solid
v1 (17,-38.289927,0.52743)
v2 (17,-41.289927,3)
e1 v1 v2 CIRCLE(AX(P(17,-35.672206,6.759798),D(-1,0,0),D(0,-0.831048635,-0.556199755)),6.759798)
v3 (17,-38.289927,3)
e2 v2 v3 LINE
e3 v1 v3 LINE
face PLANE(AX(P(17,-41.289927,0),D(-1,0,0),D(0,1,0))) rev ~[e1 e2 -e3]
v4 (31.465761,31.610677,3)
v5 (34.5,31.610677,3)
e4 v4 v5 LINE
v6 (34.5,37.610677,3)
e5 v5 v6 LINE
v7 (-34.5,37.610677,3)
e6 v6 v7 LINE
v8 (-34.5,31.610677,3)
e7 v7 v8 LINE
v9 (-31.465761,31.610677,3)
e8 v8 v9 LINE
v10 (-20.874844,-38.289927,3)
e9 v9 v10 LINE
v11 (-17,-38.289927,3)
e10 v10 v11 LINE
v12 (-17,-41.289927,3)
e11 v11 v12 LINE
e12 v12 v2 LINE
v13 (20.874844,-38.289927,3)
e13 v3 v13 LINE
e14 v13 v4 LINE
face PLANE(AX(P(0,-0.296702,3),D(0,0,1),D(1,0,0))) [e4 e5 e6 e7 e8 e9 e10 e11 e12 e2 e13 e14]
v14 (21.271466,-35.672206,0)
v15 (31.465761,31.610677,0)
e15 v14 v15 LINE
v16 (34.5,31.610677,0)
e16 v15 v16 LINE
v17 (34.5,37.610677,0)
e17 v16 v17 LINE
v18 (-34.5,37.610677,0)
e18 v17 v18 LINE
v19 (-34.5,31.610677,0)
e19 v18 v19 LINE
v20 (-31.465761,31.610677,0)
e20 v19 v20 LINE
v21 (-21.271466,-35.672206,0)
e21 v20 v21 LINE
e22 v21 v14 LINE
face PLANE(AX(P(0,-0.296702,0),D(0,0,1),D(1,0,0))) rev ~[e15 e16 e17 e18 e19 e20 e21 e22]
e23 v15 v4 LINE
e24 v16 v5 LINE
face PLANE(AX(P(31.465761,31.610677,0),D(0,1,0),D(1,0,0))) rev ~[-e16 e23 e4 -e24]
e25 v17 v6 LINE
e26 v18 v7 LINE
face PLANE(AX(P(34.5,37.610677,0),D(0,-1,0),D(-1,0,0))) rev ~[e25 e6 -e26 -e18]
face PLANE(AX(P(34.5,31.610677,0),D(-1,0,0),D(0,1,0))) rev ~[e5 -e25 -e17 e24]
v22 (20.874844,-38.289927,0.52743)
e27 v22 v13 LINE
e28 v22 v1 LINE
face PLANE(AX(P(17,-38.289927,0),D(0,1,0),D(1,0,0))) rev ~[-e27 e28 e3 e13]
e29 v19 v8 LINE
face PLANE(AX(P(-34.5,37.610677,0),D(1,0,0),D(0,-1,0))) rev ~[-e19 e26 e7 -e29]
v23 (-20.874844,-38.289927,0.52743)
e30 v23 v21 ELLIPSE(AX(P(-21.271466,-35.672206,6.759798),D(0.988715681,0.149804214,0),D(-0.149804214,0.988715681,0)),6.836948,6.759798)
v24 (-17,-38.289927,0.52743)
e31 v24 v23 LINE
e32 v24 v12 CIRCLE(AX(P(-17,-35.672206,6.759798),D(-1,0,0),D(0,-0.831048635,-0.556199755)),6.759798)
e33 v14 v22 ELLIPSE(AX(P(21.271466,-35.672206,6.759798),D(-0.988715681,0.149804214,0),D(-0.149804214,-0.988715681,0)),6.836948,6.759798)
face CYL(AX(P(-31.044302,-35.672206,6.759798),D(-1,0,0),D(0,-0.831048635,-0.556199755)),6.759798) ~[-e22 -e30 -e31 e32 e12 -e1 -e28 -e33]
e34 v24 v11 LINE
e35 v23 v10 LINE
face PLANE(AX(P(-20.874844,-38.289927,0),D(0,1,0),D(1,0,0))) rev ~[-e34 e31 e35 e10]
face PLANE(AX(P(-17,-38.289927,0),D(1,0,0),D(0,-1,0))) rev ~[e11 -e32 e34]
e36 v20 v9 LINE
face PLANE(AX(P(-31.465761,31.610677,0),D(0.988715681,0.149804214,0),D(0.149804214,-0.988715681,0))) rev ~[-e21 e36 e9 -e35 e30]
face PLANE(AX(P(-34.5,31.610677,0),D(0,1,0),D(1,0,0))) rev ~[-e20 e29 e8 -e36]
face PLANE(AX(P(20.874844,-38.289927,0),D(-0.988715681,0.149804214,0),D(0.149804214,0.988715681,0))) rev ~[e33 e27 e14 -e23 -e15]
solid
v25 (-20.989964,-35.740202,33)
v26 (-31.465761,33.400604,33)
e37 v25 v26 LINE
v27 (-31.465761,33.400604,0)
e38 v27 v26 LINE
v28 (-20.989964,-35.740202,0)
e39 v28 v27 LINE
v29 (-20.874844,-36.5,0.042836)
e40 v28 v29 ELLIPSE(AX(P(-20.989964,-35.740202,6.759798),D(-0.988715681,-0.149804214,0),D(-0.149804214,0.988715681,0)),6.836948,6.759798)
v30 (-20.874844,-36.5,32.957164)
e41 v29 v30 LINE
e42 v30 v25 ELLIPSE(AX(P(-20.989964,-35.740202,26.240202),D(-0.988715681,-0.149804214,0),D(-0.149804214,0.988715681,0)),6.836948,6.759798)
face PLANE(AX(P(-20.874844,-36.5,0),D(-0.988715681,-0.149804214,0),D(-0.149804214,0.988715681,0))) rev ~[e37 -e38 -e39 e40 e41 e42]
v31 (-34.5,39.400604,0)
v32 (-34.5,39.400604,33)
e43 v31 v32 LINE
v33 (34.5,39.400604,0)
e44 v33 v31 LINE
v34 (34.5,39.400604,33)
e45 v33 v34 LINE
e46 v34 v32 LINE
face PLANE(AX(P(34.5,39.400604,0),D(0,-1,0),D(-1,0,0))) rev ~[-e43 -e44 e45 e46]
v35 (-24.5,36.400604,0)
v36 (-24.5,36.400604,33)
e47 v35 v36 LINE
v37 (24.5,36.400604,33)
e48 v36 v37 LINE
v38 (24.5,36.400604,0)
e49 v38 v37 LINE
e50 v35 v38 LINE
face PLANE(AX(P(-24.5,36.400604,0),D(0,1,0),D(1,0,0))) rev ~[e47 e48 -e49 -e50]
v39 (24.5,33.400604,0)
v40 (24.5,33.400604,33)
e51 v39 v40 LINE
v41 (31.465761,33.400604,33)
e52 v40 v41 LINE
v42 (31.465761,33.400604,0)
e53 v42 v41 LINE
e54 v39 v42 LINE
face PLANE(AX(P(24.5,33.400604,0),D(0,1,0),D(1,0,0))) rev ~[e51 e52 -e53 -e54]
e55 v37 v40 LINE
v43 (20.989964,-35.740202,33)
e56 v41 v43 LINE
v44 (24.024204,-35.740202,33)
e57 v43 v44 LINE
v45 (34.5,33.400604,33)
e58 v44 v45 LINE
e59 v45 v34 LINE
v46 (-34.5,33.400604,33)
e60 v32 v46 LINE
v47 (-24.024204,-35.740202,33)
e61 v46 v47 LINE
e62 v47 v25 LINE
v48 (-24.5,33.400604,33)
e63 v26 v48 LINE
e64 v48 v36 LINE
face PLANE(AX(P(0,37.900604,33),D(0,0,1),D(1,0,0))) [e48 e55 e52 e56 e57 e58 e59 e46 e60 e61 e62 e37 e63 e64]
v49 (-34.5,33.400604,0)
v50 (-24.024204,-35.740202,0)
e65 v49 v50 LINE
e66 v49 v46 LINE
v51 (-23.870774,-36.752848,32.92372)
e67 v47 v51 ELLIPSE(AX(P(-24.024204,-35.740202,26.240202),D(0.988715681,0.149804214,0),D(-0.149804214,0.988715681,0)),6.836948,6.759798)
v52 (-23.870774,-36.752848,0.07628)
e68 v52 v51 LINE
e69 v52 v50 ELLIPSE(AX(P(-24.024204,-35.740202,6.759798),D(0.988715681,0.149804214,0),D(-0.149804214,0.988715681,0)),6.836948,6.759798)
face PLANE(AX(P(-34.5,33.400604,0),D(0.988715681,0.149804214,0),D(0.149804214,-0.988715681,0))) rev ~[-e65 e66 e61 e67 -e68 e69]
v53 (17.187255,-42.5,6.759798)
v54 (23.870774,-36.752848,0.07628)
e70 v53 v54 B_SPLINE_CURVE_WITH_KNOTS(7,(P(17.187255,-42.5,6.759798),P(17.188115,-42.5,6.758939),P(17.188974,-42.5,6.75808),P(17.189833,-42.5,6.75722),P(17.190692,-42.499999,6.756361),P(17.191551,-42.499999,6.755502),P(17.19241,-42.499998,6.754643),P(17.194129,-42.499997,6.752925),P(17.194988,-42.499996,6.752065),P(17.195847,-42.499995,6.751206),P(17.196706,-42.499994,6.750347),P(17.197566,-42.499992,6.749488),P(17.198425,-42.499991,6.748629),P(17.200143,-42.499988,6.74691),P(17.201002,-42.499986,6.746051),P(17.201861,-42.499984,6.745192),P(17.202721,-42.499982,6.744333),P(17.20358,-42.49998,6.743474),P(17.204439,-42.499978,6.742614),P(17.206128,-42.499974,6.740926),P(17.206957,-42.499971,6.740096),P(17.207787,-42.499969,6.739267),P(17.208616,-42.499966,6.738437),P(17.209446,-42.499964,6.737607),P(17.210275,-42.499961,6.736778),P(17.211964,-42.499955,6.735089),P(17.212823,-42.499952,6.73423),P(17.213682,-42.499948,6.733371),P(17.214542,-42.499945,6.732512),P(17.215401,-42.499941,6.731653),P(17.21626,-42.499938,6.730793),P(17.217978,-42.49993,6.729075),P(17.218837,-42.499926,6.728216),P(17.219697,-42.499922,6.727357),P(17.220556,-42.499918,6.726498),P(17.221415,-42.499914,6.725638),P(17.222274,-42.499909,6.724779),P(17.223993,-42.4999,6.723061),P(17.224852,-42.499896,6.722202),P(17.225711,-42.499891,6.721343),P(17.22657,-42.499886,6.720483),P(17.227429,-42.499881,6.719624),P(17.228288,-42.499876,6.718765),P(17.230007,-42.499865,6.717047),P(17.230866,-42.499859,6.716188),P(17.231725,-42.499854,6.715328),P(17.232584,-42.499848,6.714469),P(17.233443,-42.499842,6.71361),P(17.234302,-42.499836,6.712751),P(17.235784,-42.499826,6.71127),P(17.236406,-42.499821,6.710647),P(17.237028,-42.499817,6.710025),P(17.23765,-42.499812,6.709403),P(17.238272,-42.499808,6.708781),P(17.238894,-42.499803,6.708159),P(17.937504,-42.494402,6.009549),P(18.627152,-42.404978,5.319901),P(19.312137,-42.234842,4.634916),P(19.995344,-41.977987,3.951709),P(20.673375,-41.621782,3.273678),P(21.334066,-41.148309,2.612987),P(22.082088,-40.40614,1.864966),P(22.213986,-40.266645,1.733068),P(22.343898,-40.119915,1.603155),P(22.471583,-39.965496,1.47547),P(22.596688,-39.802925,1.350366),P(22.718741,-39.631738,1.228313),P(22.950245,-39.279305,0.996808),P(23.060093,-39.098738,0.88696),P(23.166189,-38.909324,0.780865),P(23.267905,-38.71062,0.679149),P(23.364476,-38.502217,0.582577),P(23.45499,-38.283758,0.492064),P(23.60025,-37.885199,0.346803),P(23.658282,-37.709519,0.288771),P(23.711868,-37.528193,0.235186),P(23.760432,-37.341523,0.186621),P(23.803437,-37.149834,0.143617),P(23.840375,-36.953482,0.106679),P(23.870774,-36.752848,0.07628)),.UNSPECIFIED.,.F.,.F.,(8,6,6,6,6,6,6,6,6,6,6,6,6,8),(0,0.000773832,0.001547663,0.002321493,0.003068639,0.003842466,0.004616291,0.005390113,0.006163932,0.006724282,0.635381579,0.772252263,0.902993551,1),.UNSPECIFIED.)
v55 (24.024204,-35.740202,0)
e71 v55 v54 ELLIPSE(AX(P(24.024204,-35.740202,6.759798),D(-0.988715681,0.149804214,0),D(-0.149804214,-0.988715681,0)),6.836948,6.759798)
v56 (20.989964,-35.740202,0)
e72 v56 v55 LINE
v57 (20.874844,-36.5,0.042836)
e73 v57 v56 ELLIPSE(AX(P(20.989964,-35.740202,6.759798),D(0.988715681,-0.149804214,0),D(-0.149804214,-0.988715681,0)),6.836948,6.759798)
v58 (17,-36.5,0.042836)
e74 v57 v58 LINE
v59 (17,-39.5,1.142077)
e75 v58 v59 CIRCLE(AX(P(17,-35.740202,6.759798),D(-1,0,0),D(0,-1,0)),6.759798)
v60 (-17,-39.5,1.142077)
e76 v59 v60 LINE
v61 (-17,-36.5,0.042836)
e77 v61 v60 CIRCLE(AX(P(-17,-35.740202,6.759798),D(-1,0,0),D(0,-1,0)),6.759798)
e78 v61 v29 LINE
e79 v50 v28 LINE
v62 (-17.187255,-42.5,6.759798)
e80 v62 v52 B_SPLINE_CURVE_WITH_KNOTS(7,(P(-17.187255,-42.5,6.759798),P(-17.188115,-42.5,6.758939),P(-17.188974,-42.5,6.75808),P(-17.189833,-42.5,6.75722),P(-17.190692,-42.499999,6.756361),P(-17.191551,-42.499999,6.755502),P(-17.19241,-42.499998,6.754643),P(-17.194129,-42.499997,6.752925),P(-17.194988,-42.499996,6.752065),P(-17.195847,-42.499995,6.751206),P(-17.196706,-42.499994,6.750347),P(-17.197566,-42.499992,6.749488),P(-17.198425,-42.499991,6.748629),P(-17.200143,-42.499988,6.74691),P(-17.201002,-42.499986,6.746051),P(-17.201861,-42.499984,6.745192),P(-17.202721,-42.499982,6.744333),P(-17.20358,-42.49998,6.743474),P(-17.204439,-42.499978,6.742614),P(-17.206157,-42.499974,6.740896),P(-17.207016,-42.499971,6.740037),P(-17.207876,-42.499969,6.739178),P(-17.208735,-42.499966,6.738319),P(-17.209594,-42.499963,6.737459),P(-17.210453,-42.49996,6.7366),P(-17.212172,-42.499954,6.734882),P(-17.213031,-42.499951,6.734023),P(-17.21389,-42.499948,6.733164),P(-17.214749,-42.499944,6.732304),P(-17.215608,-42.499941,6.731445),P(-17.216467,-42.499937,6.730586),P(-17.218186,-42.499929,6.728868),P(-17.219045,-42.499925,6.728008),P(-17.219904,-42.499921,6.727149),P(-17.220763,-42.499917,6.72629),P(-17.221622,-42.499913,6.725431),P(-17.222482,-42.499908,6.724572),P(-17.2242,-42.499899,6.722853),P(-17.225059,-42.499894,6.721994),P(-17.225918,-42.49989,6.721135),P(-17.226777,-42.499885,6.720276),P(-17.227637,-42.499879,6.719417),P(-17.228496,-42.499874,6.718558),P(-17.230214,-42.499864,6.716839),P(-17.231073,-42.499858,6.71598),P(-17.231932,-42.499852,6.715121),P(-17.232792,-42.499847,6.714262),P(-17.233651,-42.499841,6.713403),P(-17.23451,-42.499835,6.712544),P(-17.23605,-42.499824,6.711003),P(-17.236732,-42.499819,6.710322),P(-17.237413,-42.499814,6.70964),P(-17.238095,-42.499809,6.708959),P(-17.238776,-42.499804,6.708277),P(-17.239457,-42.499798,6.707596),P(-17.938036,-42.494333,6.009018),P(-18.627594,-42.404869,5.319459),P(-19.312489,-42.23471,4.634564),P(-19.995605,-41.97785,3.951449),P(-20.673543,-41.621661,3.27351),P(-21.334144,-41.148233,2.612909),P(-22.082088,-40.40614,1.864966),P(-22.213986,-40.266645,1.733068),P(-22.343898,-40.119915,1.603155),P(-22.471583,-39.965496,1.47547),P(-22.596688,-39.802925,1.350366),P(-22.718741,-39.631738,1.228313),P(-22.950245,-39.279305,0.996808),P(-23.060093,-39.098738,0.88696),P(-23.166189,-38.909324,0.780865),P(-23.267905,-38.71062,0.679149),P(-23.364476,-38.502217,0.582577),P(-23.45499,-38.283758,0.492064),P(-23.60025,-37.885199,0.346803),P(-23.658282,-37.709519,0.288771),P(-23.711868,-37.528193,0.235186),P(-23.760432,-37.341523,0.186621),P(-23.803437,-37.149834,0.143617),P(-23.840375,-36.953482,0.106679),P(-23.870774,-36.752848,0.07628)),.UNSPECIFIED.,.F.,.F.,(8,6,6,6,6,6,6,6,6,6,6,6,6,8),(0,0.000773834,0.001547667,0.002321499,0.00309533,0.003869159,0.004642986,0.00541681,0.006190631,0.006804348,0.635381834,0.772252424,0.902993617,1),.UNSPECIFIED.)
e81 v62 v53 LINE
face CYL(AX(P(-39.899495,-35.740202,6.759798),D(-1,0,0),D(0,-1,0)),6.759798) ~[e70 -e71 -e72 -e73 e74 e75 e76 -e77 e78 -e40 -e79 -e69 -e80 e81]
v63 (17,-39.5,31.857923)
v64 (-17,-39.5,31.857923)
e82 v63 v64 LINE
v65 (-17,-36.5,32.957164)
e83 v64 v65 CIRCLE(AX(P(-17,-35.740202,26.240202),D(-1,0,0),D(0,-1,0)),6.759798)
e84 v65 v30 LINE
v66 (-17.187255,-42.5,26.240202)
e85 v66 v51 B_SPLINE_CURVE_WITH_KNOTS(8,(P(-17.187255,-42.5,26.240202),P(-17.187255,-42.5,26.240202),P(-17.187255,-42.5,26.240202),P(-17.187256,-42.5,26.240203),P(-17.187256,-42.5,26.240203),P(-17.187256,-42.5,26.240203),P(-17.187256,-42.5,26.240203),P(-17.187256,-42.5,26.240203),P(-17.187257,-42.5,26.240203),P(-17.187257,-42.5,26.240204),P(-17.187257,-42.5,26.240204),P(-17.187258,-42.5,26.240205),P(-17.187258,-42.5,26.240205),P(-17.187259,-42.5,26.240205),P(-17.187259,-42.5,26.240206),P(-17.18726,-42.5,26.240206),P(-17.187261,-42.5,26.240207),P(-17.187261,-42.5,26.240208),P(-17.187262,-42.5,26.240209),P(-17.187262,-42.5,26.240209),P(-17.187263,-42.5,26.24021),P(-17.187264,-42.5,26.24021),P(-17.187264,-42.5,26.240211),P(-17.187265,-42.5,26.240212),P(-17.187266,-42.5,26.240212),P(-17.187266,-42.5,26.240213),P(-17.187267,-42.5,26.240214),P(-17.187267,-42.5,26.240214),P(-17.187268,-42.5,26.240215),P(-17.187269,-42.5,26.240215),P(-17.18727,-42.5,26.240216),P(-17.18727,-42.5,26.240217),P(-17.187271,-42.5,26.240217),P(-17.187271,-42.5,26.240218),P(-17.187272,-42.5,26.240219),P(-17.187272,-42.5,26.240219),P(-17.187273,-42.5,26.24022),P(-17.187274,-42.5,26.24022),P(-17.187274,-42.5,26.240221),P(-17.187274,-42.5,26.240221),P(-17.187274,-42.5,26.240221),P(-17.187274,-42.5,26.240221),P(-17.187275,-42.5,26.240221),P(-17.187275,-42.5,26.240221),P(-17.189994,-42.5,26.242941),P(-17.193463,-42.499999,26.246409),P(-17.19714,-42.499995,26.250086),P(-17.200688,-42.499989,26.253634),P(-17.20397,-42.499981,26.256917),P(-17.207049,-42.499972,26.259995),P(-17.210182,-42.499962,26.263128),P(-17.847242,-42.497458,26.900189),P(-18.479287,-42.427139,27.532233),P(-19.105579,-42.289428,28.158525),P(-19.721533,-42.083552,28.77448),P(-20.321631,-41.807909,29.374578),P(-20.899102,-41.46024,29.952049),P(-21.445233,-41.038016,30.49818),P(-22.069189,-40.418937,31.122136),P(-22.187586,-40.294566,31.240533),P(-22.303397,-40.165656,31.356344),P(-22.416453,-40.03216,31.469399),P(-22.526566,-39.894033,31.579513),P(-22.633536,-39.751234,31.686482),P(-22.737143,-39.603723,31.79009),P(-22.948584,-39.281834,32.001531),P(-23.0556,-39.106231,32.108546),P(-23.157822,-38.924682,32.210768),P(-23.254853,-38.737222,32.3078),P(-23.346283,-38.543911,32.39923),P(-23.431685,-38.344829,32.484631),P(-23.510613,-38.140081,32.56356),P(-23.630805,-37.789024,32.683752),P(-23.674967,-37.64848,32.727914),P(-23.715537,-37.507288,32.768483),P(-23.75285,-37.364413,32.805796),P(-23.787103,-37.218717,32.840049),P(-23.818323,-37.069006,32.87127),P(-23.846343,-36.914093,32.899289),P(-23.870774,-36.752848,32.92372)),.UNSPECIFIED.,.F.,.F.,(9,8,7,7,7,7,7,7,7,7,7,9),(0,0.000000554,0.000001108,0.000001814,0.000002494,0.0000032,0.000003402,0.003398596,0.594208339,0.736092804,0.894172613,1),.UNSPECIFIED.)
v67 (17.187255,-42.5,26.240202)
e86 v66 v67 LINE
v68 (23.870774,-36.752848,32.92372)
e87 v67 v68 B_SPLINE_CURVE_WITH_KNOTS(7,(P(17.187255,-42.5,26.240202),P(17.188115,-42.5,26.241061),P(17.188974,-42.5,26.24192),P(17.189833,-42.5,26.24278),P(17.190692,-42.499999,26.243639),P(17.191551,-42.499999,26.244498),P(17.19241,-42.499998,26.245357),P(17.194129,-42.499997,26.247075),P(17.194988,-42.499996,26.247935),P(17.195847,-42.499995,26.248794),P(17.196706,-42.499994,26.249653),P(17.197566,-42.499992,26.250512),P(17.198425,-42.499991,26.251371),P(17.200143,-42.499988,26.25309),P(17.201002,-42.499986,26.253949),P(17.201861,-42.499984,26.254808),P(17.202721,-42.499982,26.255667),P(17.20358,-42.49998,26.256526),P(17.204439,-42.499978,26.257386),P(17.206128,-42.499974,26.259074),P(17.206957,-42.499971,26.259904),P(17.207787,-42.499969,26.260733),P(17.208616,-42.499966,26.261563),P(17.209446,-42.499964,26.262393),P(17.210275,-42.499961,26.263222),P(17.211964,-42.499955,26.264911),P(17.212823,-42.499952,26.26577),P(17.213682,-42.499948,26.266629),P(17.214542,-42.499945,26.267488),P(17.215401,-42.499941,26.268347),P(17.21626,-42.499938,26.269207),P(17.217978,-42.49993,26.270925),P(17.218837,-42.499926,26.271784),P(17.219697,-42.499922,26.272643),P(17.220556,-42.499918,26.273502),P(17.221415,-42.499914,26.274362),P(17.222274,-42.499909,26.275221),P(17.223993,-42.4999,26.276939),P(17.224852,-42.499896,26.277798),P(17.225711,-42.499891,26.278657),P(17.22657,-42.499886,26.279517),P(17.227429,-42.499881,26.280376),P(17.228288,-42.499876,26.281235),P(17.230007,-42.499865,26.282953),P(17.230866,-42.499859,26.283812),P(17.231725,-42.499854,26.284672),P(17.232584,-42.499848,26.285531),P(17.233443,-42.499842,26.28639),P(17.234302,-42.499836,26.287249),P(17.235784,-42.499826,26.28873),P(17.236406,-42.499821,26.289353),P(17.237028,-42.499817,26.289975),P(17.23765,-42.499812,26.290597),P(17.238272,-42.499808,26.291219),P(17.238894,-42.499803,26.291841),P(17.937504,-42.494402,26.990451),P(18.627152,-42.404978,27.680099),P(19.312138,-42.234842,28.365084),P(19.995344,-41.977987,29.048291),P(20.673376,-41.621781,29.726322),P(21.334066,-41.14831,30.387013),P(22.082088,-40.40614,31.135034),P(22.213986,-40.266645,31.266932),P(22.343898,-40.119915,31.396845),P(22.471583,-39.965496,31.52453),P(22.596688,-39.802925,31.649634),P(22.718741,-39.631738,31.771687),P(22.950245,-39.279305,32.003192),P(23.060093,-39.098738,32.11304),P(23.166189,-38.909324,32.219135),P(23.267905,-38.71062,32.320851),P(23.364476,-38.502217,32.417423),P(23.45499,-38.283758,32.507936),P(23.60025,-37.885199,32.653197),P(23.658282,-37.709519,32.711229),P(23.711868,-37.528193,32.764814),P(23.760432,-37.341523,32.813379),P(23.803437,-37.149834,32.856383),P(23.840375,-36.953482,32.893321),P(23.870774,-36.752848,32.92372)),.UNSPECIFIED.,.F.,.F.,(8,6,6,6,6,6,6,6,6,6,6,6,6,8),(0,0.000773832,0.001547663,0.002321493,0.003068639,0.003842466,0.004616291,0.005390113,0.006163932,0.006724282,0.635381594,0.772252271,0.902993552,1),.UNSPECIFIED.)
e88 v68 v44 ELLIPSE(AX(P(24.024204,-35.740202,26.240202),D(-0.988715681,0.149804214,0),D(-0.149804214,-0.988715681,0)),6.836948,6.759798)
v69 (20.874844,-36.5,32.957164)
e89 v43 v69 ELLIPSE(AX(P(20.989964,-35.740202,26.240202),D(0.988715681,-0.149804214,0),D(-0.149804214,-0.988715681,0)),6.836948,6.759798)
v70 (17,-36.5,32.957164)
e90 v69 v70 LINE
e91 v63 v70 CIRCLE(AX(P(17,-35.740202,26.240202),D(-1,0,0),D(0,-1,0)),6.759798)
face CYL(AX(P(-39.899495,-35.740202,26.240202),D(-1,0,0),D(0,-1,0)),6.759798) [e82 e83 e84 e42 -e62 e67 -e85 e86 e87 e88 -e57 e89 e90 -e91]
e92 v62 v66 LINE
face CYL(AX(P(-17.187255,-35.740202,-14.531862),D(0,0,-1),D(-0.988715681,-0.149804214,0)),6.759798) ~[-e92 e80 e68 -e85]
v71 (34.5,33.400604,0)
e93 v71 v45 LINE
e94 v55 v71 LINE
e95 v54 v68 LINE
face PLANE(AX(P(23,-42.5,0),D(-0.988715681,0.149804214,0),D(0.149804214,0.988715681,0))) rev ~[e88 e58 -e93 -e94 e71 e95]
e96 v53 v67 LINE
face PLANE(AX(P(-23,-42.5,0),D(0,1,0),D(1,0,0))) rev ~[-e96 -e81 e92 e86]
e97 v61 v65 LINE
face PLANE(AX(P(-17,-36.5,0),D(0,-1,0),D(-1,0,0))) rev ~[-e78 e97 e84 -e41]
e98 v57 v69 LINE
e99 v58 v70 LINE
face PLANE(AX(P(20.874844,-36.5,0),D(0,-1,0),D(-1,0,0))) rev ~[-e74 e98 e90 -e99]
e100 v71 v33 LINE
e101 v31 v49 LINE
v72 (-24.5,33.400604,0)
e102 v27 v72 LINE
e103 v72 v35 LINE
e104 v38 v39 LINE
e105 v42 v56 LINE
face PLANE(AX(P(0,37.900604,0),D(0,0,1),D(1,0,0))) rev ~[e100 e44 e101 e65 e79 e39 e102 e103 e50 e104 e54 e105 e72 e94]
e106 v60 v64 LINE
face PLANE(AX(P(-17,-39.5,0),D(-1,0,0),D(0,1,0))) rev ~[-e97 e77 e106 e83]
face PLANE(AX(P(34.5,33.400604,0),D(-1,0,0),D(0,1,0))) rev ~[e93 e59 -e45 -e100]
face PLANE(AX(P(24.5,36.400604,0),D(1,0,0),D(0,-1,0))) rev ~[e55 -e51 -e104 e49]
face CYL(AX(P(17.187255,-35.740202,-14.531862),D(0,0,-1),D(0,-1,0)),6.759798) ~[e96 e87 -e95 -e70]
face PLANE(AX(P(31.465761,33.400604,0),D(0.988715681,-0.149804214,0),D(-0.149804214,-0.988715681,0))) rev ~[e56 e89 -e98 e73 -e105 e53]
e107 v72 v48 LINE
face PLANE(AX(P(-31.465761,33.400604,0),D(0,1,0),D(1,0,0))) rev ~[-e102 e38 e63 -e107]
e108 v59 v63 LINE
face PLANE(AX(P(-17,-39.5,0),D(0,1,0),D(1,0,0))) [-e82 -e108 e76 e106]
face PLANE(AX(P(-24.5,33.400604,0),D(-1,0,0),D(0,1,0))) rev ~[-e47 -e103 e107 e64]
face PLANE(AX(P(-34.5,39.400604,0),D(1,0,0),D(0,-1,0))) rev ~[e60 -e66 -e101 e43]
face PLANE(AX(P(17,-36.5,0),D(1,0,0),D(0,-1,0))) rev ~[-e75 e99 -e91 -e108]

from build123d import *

# Parameters (mm, degrees)
F0_W          = 34
F0_H          = 3
F1_DEPTH      = 33
F3_DEPTH      = 3
F4_T1_DEPTH   = 62.0637231031
F4_T3_DEPTH   = 79.7989898732
F4_2_T1_DEPTH = 62.0886043833


# Not quite as in the source:
# - a fillet or chamfer that OpenCascade refuses, or shapes differently, is made with other operations: its cross-section is extruded or revolved along the edge and cut away or added


with BuildPart() as f1:
    # F0 (on Top) → F1 (new body)
    with BuildSketch(Plane.XY):
        Polygon((-34.5, 39.400604268), (-34.5, 36.400604268), (-24.5, 36.400604268), (24.5, 36.400604268), (34.5, 36.400604268), (34.5, 39.400604268), align=None)
        Polygon((-24.5, 36.400604268), (-34.5, 36.400604268), (-34.5, 33.400604268), (-31.4657606752, 33.400604268), (-24.5, 33.400604268), align=None)
        Polygon((34.5, 36.400604268), (24.5, 36.400604268), (24.5, 33.400604268), (31.4657606752, 33.400604268), (34.5, 33.400604268), align=None)
        Polygon((-23, -39.5), (-23, -42.5), (-17, -42.5), (-17, -39.5), (-20.4203025109, -39.5), align=None)
        Polygon((-17, -36.5), (-20.8748443467, -36.5), (-20.4203025109, -39.5), (-17, -39.5), align=None)
        Polygon((-20.4203025109, -39.5), (-20.8748443467, -36.5), (-23, -36.5), (-23, -39.5), align=None)
        Polygon((20.4203025109, -39.5), (20.8748443467, -36.5), (17, -36.5), (17, -39.5), align=None)
        Polygon((17, -39.5), (17, -42.5), (23, -42.5), (23, -39.5), (20.4203025109, -39.5), align=None)
        Polygon((23, -36.5), (20.8748443467, -36.5), (20.4203025109, -39.5), (23, -39.5), align=None)
        Polygon((23, -42.5), (34.5, 33.400604268), (31.4657606752, 33.400604268), (20.8748443467, -36.5), (23, -36.5), (23, -39.5), align=None)
        Polygon((-31.4657606752, 33.400604268), (-34.5, 33.400604268), (-23, -42.5), (-23, -39.5), (-23, -36.5), (-20.8748443467, -36.5), align=None)
        with Locations((0, -41)):
            Rectangle(F0_W, F0_H)
    extrude(amount=F1_DEPTH)

    # F4: fillet of radius 6.7597979746 on 4 edges, made by hand

    # F4_s2 → F4_t1 (cut)
    with BuildSketch(Plane.XY.offset(-14.5318615516)):
        with BuildLine():
            ThreePointArc((-23.8707736364, -36.7528482447), (-21.5946120019, -40.8656362762), (-17.1872553794, -42.5))
            Line((-17.1872553794, -42.5), (-23, -42.5))
            Line((-23, -42.5), (-23.8707736364, -36.7528482447))
        make_face()
        with BuildLine():
            ThreePointArc((17.1872553794, -42.5), (21.5946120019, -40.8656362762), (23.8707736364, -36.7528482447))
            Line((23.8707736364, -36.7528482447), (23, -42.5))
            Line((23, -42.5), (17.1872553794, -42.5))
        make_face()
    extrude(amount=F4_T1_DEPTH, mode=Mode.SUBTRACT)

    # F4_s4 → F4_t3 (cut)
    with BuildSketch(Plane.YZ.offset(-39.8994949366)):
        with BuildLine():
            ThreePointArc((-42.5, 6.7597979746), (-40.5201010127, 1.9798989873), (-35.7402020254, 0))
            Line((-35.7402020254, 0), (-42.5, 0))
            Line((-42.5, 0), (-42.5, 6.7597979746))
        make_face()
        with BuildLine():
            ThreePointArc((-42.5, 26.2402020254), (-40.5201010127, 31.0201010127), (-35.7402020254, 33))
            Line((-35.7402020254, 33), (-42.5, 33))
            Line((-42.5, 33), (-42.5, 26.2402020254))
        make_face()
    extrude(amount=F4_T3_DEPTH, mode=Mode.SUBTRACT)


with BuildPart() as f3:
    # F2 (on Top) → F3 (new body)
    with BuildSketch(Plane.XY):
        Polygon((24.5, 34.6106770507), (-24.5, 34.6106770507), (-24.5, 31.6106770507), (-31.4657606752, 31.6106770507), (-20.8748443467, -38.2899272173), (-17, -38.2899272173), (-17, -41.2899272173), (17, -41.2899272173), (17, -38.2899272173), (20.8748443467, -38.2899272173), (31.4657606752, 31.6106770507), (24.5, 31.6106770507), align=None)
        Polygon((-34.5, 37.6106770507), (-34.5, 34.6106770507), (-24.5, 34.6106770507), (24.5, 34.6106770507), (34.5, 34.6106770507), (34.5, 37.6106770507), align=None)
        Polygon((34.5, 34.6106770507), (24.5, 34.6106770507), (24.5, 31.6106770507), (31.4657606752, 31.6106770507), (34.5, 31.6106770507), align=None)
        Polygon((-24.5, 34.6106770507), (-34.5, 34.6106770507), (-34.5, 31.6106770507), (-31.4657606752, 31.6106770507), (-24.5, 31.6106770507), align=None)
    extrude(amount=F3_DEPTH)

    # F4#2: fillet of radius 6.7597979746 on 1 edges, made by hand

    # F4_2_s2 → F4_2_t1 (cut)
    with BuildSketch(Plane.YZ.offset(-31.0443021916)):
        with BuildLine():
            ThreePointArc((-41.2899272173, 3), (-38.8564954233, 0.7969822223), (-35.6722063406, 0))
            Line((-35.6722063406, 0), (-41.2899272173, 0))
            Line((-41.2899272173, 0), (-41.2899272173, 3))
        make_face()
    extrude(amount=F4_2_T1_DEPTH, mode=Mode.SUBTRACT)


solid = Compound([f1.part, f3.part])
